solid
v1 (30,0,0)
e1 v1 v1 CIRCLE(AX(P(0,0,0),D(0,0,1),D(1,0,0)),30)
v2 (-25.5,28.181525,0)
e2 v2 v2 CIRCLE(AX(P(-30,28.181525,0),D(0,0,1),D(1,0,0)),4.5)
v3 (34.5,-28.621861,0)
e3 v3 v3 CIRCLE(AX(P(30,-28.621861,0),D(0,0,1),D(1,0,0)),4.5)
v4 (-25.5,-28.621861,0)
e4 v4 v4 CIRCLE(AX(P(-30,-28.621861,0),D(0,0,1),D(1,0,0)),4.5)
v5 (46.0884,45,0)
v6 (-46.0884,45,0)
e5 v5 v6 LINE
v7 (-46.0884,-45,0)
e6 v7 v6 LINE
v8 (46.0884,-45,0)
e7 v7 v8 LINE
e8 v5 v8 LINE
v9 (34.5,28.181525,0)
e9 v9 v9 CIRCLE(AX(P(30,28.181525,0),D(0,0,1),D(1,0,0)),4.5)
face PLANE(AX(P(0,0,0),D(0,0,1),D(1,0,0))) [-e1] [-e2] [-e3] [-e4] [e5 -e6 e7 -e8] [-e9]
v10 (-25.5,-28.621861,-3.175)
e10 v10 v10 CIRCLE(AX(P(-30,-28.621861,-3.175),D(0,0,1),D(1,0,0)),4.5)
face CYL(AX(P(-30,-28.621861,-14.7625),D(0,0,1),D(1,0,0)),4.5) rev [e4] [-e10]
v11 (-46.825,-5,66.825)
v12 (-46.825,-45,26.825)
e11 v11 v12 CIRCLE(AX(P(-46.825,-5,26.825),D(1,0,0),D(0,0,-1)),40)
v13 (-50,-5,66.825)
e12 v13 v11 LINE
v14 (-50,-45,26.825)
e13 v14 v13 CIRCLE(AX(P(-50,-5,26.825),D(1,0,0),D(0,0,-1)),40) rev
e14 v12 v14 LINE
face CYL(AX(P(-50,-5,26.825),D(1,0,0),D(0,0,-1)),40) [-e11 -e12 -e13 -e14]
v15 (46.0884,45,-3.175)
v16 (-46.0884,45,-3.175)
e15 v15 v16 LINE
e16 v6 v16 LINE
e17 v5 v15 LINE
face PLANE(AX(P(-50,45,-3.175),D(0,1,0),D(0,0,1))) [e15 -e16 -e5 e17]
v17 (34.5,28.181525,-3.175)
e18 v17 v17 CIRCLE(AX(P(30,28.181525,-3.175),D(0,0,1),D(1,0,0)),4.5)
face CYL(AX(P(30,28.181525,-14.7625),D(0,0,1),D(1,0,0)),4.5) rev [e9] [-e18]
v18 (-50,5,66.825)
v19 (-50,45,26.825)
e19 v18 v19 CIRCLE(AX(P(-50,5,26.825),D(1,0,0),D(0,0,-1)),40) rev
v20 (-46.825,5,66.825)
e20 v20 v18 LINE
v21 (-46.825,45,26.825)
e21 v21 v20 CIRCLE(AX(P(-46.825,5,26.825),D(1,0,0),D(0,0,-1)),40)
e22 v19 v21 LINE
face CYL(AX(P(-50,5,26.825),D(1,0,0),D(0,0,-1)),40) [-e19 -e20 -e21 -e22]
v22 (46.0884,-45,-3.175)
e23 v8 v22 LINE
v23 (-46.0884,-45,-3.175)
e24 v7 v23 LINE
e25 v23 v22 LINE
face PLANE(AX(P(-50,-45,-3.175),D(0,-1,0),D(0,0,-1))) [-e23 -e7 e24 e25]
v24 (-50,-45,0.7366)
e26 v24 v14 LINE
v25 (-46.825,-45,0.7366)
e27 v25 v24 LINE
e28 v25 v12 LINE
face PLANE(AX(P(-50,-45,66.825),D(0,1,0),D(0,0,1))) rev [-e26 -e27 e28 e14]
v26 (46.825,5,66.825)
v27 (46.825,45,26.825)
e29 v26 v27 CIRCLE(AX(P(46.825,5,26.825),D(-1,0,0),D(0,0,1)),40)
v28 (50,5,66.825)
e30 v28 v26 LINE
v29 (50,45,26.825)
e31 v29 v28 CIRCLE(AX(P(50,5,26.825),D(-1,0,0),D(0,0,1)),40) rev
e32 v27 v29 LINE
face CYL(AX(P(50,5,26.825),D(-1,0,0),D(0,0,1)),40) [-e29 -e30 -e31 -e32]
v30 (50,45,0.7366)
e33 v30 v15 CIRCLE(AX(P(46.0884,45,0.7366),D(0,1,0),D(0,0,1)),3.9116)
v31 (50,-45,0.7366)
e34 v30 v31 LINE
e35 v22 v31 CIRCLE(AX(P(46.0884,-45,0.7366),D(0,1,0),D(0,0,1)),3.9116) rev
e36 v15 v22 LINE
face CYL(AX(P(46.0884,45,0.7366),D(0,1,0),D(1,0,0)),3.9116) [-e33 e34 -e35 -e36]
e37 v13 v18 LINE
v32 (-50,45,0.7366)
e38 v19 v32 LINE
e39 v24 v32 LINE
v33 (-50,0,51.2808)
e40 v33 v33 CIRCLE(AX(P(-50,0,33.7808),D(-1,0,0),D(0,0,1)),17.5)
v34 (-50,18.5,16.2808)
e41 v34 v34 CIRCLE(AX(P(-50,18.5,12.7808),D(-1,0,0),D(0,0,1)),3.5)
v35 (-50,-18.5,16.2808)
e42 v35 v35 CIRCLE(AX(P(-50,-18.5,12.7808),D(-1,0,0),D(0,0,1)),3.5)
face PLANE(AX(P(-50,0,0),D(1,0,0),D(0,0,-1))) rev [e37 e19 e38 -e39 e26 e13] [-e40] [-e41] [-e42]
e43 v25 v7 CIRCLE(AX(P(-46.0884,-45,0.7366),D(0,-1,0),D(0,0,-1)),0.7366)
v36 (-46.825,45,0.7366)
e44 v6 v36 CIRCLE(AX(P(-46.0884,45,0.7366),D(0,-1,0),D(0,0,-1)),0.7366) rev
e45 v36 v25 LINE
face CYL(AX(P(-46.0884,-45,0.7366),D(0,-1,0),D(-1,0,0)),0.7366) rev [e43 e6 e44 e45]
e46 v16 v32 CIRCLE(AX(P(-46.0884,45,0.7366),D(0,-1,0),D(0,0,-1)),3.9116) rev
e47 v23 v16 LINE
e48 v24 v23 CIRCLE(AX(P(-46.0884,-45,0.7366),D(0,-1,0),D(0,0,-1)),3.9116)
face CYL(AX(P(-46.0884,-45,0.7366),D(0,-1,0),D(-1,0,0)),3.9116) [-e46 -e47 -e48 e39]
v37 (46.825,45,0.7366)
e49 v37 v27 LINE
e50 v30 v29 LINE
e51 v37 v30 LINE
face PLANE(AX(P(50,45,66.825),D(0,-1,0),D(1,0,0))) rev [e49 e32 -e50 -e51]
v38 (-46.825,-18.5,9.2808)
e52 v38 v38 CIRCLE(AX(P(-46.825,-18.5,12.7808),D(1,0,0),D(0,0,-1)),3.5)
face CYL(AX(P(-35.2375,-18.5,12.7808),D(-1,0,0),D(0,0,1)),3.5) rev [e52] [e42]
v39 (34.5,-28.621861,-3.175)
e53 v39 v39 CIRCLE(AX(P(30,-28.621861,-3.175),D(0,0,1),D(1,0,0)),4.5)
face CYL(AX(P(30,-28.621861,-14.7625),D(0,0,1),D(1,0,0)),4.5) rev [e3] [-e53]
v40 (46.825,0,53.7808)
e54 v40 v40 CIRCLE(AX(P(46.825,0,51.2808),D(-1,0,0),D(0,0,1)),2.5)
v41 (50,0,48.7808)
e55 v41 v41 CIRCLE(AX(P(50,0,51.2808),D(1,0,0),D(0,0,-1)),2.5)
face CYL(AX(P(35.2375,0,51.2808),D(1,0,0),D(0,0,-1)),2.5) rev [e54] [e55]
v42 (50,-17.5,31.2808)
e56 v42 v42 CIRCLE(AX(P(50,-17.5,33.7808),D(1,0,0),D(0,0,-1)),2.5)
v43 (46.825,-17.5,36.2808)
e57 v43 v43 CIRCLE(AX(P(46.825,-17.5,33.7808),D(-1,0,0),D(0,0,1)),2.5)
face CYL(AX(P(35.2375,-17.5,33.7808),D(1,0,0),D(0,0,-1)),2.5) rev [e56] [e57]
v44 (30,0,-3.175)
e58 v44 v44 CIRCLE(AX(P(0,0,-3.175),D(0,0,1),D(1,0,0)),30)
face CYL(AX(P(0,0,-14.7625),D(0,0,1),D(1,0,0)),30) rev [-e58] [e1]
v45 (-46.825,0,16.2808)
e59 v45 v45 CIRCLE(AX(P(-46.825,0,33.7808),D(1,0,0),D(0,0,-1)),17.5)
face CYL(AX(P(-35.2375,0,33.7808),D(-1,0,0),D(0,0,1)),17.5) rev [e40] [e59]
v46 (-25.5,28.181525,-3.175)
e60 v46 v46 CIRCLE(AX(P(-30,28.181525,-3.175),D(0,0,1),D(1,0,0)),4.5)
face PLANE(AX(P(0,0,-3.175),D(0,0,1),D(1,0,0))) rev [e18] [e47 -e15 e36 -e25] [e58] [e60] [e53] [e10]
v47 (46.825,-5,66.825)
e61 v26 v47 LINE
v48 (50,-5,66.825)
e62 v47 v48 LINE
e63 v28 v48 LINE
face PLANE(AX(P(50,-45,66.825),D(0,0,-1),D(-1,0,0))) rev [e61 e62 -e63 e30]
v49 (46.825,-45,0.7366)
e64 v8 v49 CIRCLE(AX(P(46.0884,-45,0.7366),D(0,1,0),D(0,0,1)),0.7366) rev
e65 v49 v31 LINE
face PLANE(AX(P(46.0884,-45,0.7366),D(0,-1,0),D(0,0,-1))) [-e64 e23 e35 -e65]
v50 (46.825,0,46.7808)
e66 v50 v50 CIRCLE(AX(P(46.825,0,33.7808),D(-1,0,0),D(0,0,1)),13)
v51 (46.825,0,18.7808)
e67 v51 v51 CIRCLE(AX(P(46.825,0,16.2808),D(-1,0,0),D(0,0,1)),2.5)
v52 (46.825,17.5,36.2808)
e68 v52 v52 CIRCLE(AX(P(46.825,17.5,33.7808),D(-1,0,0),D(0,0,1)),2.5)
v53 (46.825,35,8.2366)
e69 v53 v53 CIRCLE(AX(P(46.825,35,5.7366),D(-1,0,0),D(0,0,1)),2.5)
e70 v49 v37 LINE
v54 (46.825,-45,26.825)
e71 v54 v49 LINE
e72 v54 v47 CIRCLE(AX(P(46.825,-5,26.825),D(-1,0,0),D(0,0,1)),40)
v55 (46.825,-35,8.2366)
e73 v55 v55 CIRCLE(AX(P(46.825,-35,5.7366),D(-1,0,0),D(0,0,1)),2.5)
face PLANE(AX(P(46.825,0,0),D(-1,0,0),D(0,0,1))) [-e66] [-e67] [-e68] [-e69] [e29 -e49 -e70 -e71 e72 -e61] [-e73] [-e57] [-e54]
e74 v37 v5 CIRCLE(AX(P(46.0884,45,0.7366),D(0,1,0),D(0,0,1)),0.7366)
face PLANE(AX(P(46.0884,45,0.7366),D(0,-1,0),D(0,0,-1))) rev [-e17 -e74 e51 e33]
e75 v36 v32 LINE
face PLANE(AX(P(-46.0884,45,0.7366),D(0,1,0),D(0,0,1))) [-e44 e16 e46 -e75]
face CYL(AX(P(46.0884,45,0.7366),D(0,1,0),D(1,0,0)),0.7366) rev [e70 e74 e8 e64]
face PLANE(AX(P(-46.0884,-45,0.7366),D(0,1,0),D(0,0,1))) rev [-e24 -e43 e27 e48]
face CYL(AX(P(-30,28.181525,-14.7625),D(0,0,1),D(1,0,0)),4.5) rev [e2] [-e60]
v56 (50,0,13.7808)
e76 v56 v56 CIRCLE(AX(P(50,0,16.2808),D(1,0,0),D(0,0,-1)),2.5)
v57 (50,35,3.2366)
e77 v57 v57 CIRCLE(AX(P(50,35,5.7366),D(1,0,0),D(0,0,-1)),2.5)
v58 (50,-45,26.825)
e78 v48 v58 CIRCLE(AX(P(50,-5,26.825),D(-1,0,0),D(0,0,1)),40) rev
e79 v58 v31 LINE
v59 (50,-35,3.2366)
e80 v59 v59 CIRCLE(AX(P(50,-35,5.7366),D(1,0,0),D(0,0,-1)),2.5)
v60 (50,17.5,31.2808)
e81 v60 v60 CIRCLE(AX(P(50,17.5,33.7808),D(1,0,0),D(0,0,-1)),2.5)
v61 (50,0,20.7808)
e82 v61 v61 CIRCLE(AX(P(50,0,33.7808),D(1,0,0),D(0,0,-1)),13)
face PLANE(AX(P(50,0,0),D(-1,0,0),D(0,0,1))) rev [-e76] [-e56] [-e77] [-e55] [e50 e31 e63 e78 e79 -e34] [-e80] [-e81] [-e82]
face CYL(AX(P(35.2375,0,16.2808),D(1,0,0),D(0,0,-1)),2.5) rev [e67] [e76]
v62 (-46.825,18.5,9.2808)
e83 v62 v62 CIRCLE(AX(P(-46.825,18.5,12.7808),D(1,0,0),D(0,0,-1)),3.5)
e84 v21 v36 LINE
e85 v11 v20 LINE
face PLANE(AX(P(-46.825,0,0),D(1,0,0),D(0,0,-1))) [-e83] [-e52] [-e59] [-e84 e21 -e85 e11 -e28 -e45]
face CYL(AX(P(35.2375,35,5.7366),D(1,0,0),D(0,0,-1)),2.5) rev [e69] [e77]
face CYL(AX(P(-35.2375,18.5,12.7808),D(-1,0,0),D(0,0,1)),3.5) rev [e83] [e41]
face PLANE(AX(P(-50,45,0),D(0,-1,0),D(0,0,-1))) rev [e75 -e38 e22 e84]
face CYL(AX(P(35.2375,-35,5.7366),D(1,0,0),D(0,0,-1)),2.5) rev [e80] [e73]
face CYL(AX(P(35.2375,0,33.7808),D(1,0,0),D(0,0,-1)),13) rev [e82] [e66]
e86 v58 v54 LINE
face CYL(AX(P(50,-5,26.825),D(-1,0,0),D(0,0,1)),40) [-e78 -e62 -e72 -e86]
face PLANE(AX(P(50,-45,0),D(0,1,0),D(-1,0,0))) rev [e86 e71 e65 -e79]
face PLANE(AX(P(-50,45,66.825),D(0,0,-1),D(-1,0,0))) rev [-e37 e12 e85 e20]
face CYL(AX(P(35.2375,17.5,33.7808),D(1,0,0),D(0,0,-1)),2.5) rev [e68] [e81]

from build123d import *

# Parameters (mm, degrees)
CROQUIS22_W                        = 100
CROQUIS22_H                        = 90
BRIDA_BASE4_DEPTH                  = 3.175
BRIDA_DE_ARISTA1_STRIP_W           = 14.1732
BRIDA_DE_ARISTA1_STRIP_H           = 3.175
BRIDA_DE_ARISTA1_STRIP_CUT_DEPTH   = 90
BRIDA_DE_ARISTA1_STRIP_2_W         = 14.1732
BRIDA_DE_ARISTA1_STRIP_2_H         = 3.175
BRIDA_DE_ARISTA1_STRIP_CUT_2_DEPTH = 90
BRIDA_DE_ARISTA1_DEPTH             = 90
BRIDA_DE_ARISTA1_BEND_DEPTH        = 90
CROQUIS33_R                        = 8
CROQUIS33_R_2                      = 3.5
CORTAR_EXTRUIR3_DEPTH              = 14.7625
CROQUIS35_R                        = 13
CROQUIS35_R_2                      = 2.5
CORTAR_EXTRUIR4_DEPTH              = 14.7625
CROQUIS36_R                        = 17.5
CORTAR_EXTRUIR5_DEPTH              = 14.7625
CROQUIS37_R                        = 4.5
CROQUIS37_R_2                      = 30
CORTAR_EXTRUIR6_DEPTH              = 14.7625
REDONDEO1_R                        = 40
CROQUIS40_R                        = 2.5
CORTAR_EXTRUIR7_DEPTH              = 14.7625


# Sheet-metal steps are written as plain solids
with BuildPart() as part:
    # Croquis22 → Brida base4 (new body)
    with BuildSketch(Plane.XY):
        Rectangle(CROQUIS22_W, CROQUIS22_H)
    extrude(amount=-BRIDA_BASE4_DEPTH)

    # Brida de arista1 strip (across the edge) → Brida de arista1 strip cut (cut)
    with BuildSketch(Plane(origin=(-50, 45, 0), x_dir=(1, 0, 0), z_dir=(0, -1, 0))):
        with Locations((-3.175, -1.5875)):
            Rectangle(BRIDA_DE_ARISTA1_STRIP_W, BRIDA_DE_ARISTA1_STRIP_H)
    extrude(amount=BRIDA_DE_ARISTA1_STRIP_CUT_DEPTH, mode=Mode.SUBTRACT)

    # Brida de arista1 strip 2 (across the edge) → Brida de arista1 strip cut 2 (cut)
    with BuildSketch(Plane(origin=(50, -45, 0), x_dir=(-1, 0, 0), z_dir=(0, 1, 0))):
        with Locations((-3.175, -1.5875)):
            Rectangle(BRIDA_DE_ARISTA1_STRIP_2_W, BRIDA_DE_ARISTA1_STRIP_2_H)
    extrude(amount=BRIDA_DE_ARISTA1_STRIP_CUT_2_DEPTH, mode=Mode.SUBTRACT)

    # Brida de arista1 section (across the edge) → Brida de arista1 (add)
    with BuildSketch(Plane(origin=(-50, 45, 0), x_dir=(1, 0, 0), z_dir=(0, -1, 0))):
        with BuildLine():
            Line((0, 0.7366), (0, 66.825))
            Line((0, 66.825), (3.175, 66.825))
            Line((3.175, 66.825), (3.175, 0.7366))
            ThreePointArc((3.175, 0.7366), (3.390745145, 0.215745145), (3.9116, 0))
            Line((3.9116, 0), (3.9116, -3.175))
            ThreePointArc((3.9116, -3.175), (1.145681115, -2.029318885), (0, 0.7366))
        make_face()
    extrude(amount=BRIDA_DE_ARISTA1_DEPTH)

    # Brida de arista1 section 2 (across the edge) → Brida de arista1 bend (add)
    with BuildSketch(Plane(origin=(50, -45, 0), x_dir=(-1, 0, 0), z_dir=(0, 1, 0))):
        with BuildLine():
            Line((0, 0.7366), (0, 66.825))
            Line((0, 66.825), (3.175, 66.825))
            Line((3.175, 66.825), (3.175, 0.7366))
            ThreePointArc((3.175, 0.7366), (3.390745145, 0.215745145), (3.9116, 0))
            Line((3.9116, 0), (3.9116, -3.175))
            ThreePointArc((3.9116, -3.175), (1.145681115, -2.029318885), (0, 0.7366))
        make_face()
    extrude(amount=BRIDA_DE_ARISTA1_BEND_DEPTH)

    # Croquis33 → Cortar-Extruir3 (cut)
    with BuildSketch(Plane.ZY.offset(50)):
        with Locations((33.7808, 0)):
            Circle(CROQUIS33_R)
        with Locations((12.7808, 18.5)):
            Circle(CROQUIS33_R_2)
        with Locations((12.7808, -18.5)):
            Circle(CROQUIS33_R_2)
    extrude(amount=-CORTAR_EXTRUIR3_DEPTH, mode=Mode.SUBTRACT)

    # Croquis35 → Cortar-Extruir4 (cut)
    with BuildSketch(Plane(origin=(50, 0, 0), x_dir=(0, 0, -1), z_dir=(1, 0, 0))):
        with Locations((-33.7808, 0)):
            Circle(CROQUIS35_R)
        with Locations((-33.7808, 17.5)):
            Circle(CROQUIS35_R_2)
        with Locations((-33.7808, -17.5)):
            Circle(CROQUIS35_R_2)
        with Locations((-16.2808, 0)):
            Circle(CROQUIS35_R_2)
        with Locations((-51.2808, 0)):
            Circle(CROQUIS35_R_2)
    extrude(amount=-CORTAR_EXTRUIR4_DEPTH, mode=Mode.SUBTRACT)

    # Croquis36 → Cortar-Extruir5 (cut)
    with BuildSketch(Plane.ZY.offset(50)):
        with Locations((33.7808, 0)):
            Circle(CROQUIS36_R)
    extrude(amount=-CORTAR_EXTRUIR5_DEPTH, mode=Mode.SUBTRACT)

    # Croquis37 → Cortar-Extruir6 (cut)
    with BuildSketch(Plane.XY):
        with Locations((-30, 28.181524588)):
            Circle(CROQUIS37_R)
        with Locations((-30, -28.621860909)):
            Circle(CROQUIS37_R)
        with Locations((30, 28.181524588)):
            Circle(CROQUIS37_R)
        with Locations((30, -28.621860909)):
            Circle(CROQUIS37_R)
        Circle(CROQUIS37_R_2)
    extrude(amount=-CORTAR_EXTRUIR6_DEPTH, mode=Mode.SUBTRACT)

    # Redondeo1
    redondeo1_edges = [part.edges().sort_by_distance(p)[0] for p in [
        (-48.4125, 45, 66.825),
        (-48.4125, -45, 66.825),
        (48.4125, -45, 66.825),
        (48.4125, 45, 66.825),
    ]]
    fillet(redondeo1_edges, radius=REDONDEO1_R)

    # Croquis40 → Cortar-Extruir7 (cut)
    with BuildSketch(Plane(origin=(50, 0, 0), x_dir=(0, 0, -1), z_dir=(1, 0, 0))):
        with Locations((-5.7366, 35)):
            Circle(CROQUIS40_R)
        with Locations((-5.7366, -35)):
            Circle(CROQUIS40_R)
    extrude(amount=-CORTAR_EXTRUIR7_DEPTH, mode=Mode.SUBTRACT)


solid = part.part
